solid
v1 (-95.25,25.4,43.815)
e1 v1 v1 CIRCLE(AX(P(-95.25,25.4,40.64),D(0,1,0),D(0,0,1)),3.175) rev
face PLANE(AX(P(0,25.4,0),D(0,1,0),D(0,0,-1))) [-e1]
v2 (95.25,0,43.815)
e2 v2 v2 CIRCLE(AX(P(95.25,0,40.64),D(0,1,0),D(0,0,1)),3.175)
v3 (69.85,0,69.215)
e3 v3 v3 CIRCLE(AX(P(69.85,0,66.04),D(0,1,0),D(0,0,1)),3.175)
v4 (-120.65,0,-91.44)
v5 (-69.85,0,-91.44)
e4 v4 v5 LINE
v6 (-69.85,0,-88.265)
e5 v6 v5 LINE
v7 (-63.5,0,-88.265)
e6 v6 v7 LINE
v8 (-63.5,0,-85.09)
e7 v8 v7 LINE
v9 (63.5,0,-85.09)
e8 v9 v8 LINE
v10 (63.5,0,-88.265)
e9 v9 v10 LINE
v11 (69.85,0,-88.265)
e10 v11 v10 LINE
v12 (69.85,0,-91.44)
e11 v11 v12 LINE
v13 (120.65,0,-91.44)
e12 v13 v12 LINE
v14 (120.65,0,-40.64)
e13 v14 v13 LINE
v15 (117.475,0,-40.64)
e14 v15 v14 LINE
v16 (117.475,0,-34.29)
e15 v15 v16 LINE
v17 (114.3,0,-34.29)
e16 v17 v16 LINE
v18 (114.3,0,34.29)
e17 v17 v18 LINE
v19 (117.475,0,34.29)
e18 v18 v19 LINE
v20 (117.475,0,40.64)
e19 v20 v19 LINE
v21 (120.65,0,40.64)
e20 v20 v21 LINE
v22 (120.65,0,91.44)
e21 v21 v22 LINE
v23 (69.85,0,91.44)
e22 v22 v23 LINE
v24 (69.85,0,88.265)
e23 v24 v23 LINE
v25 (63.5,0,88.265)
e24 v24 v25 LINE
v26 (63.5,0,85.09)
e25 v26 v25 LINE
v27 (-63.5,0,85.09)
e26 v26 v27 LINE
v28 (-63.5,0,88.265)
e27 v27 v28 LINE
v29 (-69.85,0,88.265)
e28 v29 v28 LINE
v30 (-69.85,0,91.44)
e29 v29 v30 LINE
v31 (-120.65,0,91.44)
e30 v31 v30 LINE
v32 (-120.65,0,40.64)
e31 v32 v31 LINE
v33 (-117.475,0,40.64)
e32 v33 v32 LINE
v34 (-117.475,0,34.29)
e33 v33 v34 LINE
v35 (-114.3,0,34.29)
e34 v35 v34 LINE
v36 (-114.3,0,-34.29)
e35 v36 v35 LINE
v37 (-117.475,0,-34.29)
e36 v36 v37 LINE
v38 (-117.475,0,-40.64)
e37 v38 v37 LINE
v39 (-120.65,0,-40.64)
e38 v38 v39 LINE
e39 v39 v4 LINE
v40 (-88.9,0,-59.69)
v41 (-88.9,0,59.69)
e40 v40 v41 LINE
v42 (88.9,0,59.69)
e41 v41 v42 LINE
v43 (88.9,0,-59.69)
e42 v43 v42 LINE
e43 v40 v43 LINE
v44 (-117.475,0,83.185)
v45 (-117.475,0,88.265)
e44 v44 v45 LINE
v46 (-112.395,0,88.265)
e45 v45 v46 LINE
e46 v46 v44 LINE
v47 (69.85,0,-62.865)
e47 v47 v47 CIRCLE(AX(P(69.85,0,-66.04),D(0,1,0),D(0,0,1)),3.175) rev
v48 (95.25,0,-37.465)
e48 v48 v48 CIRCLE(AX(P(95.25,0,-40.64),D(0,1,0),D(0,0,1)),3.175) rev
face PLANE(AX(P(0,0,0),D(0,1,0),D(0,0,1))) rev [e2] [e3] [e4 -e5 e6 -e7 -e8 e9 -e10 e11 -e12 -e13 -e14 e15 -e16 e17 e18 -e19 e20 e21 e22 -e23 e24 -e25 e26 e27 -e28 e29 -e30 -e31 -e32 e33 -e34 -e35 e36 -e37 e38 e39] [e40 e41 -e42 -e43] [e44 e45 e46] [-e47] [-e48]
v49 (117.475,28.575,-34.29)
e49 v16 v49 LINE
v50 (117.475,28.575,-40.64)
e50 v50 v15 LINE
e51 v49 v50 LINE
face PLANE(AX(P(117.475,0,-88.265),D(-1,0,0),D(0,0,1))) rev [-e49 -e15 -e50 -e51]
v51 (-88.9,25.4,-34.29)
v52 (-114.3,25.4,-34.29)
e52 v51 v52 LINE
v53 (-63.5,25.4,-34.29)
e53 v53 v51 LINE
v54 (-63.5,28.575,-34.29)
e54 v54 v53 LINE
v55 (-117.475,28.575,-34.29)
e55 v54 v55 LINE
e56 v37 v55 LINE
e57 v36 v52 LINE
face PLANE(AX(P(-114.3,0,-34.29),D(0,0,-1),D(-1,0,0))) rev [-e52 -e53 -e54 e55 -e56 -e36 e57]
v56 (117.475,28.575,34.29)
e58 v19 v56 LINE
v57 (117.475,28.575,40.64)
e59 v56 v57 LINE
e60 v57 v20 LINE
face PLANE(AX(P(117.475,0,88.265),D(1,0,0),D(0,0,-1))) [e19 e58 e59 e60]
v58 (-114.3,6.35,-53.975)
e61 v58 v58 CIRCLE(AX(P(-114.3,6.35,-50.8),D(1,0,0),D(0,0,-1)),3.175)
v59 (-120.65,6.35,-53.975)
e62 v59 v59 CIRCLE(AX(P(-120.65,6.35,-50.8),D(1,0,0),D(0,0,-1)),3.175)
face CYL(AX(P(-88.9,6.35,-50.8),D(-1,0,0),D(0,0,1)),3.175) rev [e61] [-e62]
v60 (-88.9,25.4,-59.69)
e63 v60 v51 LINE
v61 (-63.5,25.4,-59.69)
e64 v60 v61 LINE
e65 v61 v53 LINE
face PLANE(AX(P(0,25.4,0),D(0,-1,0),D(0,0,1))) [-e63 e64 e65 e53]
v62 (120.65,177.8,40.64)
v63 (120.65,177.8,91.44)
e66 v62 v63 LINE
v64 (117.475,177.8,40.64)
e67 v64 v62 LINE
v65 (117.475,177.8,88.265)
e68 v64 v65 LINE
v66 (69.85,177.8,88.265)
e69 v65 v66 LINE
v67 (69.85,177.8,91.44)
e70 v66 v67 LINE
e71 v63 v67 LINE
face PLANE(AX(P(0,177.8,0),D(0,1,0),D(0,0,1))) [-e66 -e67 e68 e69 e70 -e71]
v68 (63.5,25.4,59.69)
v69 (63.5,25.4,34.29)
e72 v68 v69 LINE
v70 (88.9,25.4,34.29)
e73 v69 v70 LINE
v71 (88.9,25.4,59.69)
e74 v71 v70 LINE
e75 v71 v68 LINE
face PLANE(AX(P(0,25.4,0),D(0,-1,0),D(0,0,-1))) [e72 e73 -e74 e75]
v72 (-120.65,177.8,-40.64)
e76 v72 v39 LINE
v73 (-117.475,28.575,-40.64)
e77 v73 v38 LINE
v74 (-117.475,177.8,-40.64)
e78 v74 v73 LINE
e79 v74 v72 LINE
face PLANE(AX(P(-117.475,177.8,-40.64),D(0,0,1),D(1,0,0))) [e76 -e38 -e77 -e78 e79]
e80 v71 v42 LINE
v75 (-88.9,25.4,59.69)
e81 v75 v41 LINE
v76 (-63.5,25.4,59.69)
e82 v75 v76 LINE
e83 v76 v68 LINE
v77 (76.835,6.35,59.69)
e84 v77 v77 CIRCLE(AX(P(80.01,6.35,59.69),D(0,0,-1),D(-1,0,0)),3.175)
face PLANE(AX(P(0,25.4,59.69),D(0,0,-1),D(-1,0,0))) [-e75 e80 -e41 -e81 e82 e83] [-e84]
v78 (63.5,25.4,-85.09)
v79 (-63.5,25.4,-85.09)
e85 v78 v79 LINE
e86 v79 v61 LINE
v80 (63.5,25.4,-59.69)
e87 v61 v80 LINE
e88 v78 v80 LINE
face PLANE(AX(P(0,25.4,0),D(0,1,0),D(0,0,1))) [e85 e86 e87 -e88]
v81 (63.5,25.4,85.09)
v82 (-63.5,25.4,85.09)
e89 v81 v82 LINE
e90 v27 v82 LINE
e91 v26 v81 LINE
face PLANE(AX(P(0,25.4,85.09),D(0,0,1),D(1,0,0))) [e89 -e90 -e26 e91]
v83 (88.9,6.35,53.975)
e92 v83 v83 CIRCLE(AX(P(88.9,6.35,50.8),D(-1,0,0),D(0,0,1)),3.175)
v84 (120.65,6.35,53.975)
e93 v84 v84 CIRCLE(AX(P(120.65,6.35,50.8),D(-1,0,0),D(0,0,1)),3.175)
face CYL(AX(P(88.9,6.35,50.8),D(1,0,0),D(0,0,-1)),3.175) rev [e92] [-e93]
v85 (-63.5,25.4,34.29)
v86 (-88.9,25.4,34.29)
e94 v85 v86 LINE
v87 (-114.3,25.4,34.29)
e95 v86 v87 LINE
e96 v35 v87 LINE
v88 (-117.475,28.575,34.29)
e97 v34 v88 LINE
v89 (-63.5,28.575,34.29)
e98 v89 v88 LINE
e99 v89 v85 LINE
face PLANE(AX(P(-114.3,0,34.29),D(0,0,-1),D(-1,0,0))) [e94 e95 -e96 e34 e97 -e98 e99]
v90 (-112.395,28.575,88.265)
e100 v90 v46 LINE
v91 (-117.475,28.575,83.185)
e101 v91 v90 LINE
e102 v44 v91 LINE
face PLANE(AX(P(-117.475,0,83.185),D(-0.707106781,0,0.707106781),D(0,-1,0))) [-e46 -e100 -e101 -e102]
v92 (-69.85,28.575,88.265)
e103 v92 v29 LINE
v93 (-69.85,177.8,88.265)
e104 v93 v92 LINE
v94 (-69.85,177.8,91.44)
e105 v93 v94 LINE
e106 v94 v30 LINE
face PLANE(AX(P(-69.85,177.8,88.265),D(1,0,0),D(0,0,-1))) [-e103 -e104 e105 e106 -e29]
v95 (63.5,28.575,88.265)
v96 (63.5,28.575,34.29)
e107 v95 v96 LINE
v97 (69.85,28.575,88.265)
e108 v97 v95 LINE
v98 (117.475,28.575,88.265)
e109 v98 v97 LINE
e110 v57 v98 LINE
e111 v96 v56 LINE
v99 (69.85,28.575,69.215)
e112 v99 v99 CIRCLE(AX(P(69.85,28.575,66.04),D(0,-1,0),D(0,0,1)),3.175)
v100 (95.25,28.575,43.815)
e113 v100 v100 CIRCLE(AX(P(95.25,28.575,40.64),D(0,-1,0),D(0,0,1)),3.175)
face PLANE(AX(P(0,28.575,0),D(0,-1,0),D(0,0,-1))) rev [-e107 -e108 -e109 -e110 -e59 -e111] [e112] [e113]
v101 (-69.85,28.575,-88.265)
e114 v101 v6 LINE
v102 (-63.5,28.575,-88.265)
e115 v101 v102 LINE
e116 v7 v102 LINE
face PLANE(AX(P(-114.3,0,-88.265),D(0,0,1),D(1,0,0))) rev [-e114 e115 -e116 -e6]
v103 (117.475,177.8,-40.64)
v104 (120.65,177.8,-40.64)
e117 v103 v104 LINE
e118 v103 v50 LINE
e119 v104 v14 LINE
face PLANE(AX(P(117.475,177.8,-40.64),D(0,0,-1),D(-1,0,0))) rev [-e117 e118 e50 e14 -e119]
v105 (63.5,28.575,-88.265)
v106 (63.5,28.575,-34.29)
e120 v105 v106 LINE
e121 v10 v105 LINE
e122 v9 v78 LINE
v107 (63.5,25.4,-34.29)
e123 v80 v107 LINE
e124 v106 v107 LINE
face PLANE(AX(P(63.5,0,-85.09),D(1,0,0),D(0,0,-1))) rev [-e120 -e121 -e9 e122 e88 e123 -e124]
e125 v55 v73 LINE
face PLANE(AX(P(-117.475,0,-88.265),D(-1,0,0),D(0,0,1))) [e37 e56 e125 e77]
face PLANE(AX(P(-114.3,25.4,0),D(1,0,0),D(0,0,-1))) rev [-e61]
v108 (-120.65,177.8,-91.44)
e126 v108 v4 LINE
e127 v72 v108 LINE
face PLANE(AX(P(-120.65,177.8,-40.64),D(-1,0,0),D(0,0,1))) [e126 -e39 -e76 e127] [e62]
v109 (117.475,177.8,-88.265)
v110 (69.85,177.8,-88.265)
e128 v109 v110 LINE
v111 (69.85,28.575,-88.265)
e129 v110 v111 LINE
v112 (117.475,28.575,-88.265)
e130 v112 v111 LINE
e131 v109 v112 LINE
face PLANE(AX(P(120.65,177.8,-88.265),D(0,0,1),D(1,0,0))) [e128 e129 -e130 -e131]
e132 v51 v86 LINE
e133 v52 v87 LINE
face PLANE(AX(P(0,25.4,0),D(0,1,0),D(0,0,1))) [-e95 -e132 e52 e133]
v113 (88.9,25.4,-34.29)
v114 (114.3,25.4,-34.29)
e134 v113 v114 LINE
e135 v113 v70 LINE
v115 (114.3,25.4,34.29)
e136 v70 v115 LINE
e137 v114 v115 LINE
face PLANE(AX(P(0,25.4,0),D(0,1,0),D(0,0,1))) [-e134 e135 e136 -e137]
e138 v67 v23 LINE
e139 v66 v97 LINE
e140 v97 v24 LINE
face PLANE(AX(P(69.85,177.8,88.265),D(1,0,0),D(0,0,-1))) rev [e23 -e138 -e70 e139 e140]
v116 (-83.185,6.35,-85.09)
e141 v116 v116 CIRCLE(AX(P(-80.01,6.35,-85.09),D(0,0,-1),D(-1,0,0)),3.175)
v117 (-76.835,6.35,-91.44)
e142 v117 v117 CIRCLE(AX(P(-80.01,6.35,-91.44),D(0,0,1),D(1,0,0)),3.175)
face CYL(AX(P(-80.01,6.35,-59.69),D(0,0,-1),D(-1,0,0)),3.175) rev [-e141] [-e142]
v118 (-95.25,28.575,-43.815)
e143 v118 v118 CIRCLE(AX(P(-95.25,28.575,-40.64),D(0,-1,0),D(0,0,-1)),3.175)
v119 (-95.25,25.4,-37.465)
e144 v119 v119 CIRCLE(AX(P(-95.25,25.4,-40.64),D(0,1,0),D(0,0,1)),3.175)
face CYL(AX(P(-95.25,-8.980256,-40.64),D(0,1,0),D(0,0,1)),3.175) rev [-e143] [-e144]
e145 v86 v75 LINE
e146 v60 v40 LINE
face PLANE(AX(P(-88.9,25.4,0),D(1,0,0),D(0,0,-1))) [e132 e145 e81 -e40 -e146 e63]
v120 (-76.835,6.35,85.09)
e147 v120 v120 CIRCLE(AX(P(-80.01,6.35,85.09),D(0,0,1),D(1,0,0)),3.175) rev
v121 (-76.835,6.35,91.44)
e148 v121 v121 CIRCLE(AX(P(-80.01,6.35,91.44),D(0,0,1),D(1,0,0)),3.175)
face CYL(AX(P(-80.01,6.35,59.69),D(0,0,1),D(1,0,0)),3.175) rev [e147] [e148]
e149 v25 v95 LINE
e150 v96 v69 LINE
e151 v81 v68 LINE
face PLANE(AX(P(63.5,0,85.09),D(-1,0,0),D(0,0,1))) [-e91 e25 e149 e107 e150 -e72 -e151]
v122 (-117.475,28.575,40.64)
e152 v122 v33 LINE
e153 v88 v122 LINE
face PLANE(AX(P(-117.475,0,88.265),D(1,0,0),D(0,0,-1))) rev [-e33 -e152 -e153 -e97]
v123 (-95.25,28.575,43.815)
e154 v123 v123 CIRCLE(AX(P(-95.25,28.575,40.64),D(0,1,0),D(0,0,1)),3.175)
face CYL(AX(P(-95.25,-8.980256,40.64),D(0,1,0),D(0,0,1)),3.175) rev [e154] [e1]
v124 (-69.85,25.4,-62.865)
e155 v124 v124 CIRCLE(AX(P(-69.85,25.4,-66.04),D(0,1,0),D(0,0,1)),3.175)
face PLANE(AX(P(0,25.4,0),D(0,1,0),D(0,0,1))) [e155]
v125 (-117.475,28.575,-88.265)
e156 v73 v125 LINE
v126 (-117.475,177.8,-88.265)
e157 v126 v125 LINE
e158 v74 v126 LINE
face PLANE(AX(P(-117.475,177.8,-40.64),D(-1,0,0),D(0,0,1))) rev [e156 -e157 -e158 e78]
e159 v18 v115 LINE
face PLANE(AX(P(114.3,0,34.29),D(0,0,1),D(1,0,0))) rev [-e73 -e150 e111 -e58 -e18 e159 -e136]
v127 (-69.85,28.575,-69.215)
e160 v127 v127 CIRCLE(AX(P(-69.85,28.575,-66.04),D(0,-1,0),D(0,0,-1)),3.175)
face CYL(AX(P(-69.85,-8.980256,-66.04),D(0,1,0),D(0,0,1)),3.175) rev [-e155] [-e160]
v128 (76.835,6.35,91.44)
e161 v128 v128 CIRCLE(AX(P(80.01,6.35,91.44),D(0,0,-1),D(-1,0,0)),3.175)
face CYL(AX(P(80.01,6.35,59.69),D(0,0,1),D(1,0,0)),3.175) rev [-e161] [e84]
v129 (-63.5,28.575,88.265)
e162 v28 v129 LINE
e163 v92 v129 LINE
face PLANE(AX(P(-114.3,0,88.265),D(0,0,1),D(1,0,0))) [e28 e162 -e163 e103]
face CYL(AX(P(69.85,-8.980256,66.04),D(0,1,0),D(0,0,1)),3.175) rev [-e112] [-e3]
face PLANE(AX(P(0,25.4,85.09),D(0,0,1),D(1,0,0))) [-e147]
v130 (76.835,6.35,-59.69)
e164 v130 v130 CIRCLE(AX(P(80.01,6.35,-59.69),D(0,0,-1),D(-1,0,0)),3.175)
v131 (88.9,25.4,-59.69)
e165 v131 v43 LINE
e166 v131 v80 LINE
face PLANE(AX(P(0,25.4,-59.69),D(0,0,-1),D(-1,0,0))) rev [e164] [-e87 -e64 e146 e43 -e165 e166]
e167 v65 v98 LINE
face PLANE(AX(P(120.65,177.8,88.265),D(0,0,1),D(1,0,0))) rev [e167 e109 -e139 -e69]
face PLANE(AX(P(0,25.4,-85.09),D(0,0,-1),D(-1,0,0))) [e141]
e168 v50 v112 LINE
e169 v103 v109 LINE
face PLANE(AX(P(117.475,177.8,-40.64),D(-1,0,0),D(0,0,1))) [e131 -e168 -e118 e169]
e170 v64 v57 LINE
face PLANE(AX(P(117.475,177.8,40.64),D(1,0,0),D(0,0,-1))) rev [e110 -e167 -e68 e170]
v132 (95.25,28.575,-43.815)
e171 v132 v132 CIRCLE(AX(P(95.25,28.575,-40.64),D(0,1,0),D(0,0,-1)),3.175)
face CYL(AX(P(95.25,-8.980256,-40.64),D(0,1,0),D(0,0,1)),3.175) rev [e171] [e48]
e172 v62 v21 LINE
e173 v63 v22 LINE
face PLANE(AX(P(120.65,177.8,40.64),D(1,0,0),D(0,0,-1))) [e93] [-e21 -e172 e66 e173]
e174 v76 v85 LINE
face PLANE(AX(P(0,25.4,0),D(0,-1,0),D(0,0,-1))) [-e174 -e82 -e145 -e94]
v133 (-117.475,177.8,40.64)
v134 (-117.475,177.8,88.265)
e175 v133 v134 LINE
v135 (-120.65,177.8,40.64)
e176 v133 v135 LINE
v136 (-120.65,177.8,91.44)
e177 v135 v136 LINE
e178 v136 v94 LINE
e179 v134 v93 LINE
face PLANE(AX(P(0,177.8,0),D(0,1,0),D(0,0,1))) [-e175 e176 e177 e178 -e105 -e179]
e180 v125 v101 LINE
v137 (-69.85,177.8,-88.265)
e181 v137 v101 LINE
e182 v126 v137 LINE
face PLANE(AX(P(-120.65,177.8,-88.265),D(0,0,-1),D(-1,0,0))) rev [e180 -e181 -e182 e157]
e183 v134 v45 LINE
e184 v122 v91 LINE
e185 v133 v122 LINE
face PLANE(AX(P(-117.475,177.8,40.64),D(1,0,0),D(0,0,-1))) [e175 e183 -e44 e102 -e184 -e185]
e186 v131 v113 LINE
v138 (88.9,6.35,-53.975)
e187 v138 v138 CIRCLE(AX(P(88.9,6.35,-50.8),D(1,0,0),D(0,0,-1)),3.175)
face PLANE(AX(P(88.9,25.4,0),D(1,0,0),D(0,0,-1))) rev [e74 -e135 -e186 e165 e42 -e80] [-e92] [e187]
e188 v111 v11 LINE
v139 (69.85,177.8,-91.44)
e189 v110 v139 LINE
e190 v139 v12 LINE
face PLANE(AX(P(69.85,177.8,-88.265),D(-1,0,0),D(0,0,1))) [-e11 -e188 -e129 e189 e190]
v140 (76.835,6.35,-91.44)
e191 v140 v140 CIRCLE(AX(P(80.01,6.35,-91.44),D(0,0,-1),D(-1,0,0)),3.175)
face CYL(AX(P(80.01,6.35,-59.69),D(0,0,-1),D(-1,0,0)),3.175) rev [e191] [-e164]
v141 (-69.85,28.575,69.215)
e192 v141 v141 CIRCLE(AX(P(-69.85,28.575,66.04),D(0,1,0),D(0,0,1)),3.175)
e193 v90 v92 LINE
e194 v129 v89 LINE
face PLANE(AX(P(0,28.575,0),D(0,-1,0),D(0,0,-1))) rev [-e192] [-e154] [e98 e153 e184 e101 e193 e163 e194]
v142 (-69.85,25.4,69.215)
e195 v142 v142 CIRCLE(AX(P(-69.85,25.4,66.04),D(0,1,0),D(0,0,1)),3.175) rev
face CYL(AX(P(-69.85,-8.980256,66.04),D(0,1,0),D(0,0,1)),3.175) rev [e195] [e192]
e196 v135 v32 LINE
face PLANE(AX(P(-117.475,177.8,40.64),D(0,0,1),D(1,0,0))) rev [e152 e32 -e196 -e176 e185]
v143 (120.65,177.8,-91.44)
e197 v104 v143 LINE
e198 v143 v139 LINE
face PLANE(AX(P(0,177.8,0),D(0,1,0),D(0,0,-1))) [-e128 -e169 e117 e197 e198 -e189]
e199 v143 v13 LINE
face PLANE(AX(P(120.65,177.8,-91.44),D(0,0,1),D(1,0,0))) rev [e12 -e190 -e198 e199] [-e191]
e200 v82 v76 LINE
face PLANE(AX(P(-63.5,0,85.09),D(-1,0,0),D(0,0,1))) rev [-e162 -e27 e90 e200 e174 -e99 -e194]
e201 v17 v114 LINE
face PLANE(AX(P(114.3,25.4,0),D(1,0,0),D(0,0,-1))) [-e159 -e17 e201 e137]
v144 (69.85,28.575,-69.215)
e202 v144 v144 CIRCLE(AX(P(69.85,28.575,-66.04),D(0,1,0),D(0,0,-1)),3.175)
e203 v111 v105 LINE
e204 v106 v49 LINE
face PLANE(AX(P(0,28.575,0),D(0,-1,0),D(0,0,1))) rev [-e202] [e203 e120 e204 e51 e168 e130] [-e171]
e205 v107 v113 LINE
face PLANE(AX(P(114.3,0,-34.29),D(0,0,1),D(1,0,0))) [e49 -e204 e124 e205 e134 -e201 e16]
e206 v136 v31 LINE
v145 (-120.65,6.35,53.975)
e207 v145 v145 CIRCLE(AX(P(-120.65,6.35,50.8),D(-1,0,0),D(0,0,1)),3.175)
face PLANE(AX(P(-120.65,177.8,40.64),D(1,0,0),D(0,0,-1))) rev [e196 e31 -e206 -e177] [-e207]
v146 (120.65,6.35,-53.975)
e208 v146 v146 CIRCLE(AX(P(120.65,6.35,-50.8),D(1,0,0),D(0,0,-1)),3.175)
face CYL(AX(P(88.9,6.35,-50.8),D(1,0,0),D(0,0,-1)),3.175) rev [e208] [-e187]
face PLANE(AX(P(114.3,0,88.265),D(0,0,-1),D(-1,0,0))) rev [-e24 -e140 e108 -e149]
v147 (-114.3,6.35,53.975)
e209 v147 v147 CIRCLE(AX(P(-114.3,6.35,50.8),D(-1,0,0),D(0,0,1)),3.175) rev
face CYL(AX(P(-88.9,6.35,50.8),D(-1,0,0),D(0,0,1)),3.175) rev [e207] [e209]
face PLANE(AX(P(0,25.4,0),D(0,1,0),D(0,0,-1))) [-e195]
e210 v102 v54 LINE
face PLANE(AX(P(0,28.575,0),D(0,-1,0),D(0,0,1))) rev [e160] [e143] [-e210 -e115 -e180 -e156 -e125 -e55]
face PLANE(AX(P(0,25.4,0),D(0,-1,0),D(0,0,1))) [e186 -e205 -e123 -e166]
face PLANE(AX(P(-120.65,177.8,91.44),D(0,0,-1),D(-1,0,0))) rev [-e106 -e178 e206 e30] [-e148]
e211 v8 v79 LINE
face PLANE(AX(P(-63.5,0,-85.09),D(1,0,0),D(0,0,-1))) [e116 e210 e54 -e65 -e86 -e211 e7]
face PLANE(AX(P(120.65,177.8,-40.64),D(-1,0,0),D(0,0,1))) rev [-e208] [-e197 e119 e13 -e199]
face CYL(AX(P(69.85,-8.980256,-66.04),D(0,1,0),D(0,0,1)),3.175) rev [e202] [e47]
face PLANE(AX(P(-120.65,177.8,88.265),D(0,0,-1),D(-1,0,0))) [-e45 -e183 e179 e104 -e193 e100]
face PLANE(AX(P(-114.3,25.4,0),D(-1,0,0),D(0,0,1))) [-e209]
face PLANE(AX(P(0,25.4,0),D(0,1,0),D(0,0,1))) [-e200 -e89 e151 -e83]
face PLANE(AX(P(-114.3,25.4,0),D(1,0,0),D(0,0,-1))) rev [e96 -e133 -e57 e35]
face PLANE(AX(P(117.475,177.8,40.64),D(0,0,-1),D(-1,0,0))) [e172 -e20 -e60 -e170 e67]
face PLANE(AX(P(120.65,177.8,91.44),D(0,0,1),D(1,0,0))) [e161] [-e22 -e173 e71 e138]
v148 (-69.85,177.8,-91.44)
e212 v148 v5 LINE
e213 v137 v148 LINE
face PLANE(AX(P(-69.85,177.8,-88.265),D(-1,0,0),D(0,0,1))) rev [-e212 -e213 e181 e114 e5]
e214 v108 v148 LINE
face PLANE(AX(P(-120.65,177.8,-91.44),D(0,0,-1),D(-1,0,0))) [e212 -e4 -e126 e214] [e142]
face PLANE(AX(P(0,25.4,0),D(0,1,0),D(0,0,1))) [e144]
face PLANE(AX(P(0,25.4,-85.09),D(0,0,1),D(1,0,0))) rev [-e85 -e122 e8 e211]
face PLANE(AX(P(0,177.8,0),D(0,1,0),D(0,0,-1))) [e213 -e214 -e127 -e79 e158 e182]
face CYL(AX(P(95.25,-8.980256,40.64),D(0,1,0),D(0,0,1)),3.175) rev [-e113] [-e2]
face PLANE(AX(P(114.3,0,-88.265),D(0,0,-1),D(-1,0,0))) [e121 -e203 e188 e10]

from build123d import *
from build123d.topology import SkipClean

# Parameters (mm, degrees)
SKETCH2_W             = 25.4
SKETCH2_H             = 119.38
BOSS_EXTRUDE1_DEPTH   = 25.4
SKETCH8_W             = 50.8
SKETCH8_H             = 3.175
BOSS_EXTRUDE9_DEPTH   = 25.4
SKETCH11_W            = 53.975
SKETCH11_H            = 53.975
BOSS_EXTRUDE12_DEPTH  = 3.175
CHAMFER3_SIZE         = 5.08
SKETCH10_W            = 3.175
SKETCH10_H            = 47.625
BOSS_EXTRUDE11_DEPTH  = 177.8
SKETCH13_R            = 3.175
CUT_EXTRUDE3_DEPTH    = 31.75
SKETCH14_R            = 3.175
CUT_EXTRUDE4_DEPTH    = 28.575
SKETCH16_R            = 3.175
CUT_EXTRUDE5_DEPTH    = 31.75
MIRROR71_START        = -1
MIRROR71_OUTLINE_R    = 3.175
MIRROR71_DEPTH        = 26.4
MIRROR71_2_DEPTH      = 177.8
MIRROR71_START_2      = 25.4
MIRROR71_3_OUTLINE_R  = 3.175
MIRROR71_3_DEPTH      = 3.175
MIRROR71_START_3      = 9.525
MIRROR71_4_OUTLINE_R  = 3.175
MIRROR71_4_DEPTH      = 15.875
MIRROR71_5_OUTLINE_R  = 3.175
MIRROR71_5_DEPTH      = 3.1749999
MIRROR71_START_4      = 2.6969085
MIRROR71_6_OUTLINE_R  = 3.175
MIRROR71_6_DEPTH      = 17.145
MIRROR71_START_5      = -85.09
MIRROR71_7_OUTLINE_W  = 3.175
MIRROR71_7_OUTLINE_H  = 6.3500001
MIRROR71_7_OUTLINE_R  = 3.175
MIRROR71_7_DEPTH      = 25.4
MIRROR71_START_6      = 59.69
MIRROR71_8_DEPTH      = 28.575
MIRROR71_START_7      = -88.265
MIRROR71_9_DEPTH      = 3.175
MIRROR71_START_8      = 85.09
MIRROR71_10_DEPTH     = 3.175
MIRROR71_START_9      = -91.896565
MIRROR71_11_OUTLINE_W = 6.3500001
MIRROR71_11_OUTLINE_H = 25.4
MIRROR71_11_DEPTH     = 155.396565
MIRROR71_START_10     = 88.9
MIRROR71_12_DEPTH     = 28.575
MIRROR71_START_11     = -114.3
MIRROR71_13_OUTLINE_R = 3.175
MIRROR71_13_DEPTH     = 25.4
MIRROR71_START_12     = 114.3
MIRROR71_14_DEPTH     = 3.175
MIRROR71_START_13     = -92
MIRROR71_15_OUTLINE_R = 3.175
MIRROR71_15_DEPTH     = 184
MIRROR71_16_OUTLINE_R = 3.175
MIRROR71_16_DEPTH     = 33.1


with BuildPart() as part:
    # Sketch2 → Boss-Extrude1 (new body)
    with BuildSketch(Plane(origin=(0, 0, 0), x_dir=(1, 0, 0), z_dir=(0, 1, 0))):
        Polygon((114.3, -59.69), (88.9, -59.69), (-88.9, -59.69), (-114.3, -59.69), (-114.3, -85.09), (114.3, -85.09), align=None)
        with Locations((101.6, 0)):
            Rectangle(SKETCH2_W, SKETCH2_H)
        Polygon((-88.9, 59.69), (88.9, 59.69), (114.3, 59.69), (114.3, 85.09), (-114.3, 85.09), (-114.3, 59.69), align=None)
        with Locations((-101.6, 0)):
            Rectangle(SKETCH2_W, SKETCH2_H)
    boss_extrude1 = extrude(amount=BOSS_EXTRUDE1_DEPTH)

    # Sketch8 → Boss-Extrude9 (add)
    with BuildSketch(Plane(origin=(0, 25.4, 0), x_dir=(1, 0, 0), z_dir=(0, 1, 0))):
        with Locations((-88.9, -86.6775)):
            Rectangle(SKETCH8_W, SKETCH8_H)
        Polygon((-114.3, -88.265), (-114.3, -85.09), (-114.3, -34.29), (-117.475, -34.29), (-117.475, -88.265), align=None)
    boss_extrude9 = extrude(amount=-BOSS_EXTRUDE9_DEPTH)

    # Sketch11 → Boss-Extrude12 (add)
    with BuildSketch(Plane(origin=(0, 25.4, 0), x_dir=(1, 0, 0), z_dir=(0, 1, 0))):
        with Locations((-90.4875, -61.2775)):
            Rectangle(SKETCH11_W, SKETCH11_H)
    boss_extrude12 = extrude(amount=BOSS_EXTRUDE12_DEPTH)

    # Chamfer3
    chamfer3_edges = [part.edges().sort_by_distance(p)[0] for p in [
        (-117.475, 14.2875, 88.265),
    ]]
    chamfer(chamfer3_edges, length=CHAMFER3_SIZE)

    # Sketch10 → Boss-Extrude11 (add)
    with BuildSketch(Plane(origin=(0, 0, 0), x_dir=(-1, 0, 0), z_dir=(0, -1, 0))):
        with Locations((119.0625, -64.4525)):
            Rectangle(SKETCH10_W, SKETCH10_H)
        Polygon((120.65, -88.265), (117.475, -88.265), (69.85, -88.265), (69.85, -91.44), (120.65, -91.44), align=None)
    boss_extrude11 = extrude(amount=-BOSS_EXTRUDE11_DEPTH)

    # Sketch13 → Cut-Extrude3 (cut)
    with BuildSketch(Plane.XY.offset(91.44)):
        with Locations((-80.01, 6.35)):
            Circle(SKETCH13_R)
    cut_extrude3 = extrude(amount=-CUT_EXTRUDE3_DEPTH, mode=Mode.SUBTRACT)

    # Sketch14 → Cut-Extrude4 (cut)
    with BuildSketch(Plane(origin=(0, 28.575, 0), x_dir=(1, 0, 0), z_dir=(0, 1, 0))):
        with Locations(Location((-69.85, -66.04, 0), (0, 0, 270))):
            Circle(SKETCH14_R)
        with Locations(Location((-95.25, -40.64, 0), (0, 0, 270))):
            Circle(SKETCH14_R)
    cut_extrude4 = extrude(amount=-CUT_EXTRUDE4_DEPTH, mode=Mode.SUBTRACT)

    # Sketch16 → Cut-Extrude5 (cut)
    with BuildSketch(Plane.ZY.offset(120.65)):
        with Locations((50.8, 6.35)):
            Circle(SKETCH16_R)
    cut_extrude5 = extrude(amount=-CUT_EXTRUDE5_DEPTH, mode=Mode.SUBTRACT)

    # Mirror70: Boss-Extrude1, Boss-Extrude9, Boss-Extrude12, Boss-Extrude11, Cut-Extrude3, Cut-Extrude4, Cut-Extrude5 across plane
    add(boss_extrude1.mirror(Plane.XY))
    add(boss_extrude9.mirror(Plane.XY))
    add(boss_extrude12.mirror(Plane.XY))
    add(boss_extrude11.mirror(Plane.XY))
    add(cut_extrude3.mirror(Plane.XY), mode=Mode.SUBTRACT)
    add(cut_extrude4.mirror(Plane.XY), mode=Mode.SUBTRACT)
    add(cut_extrude5.mirror(Plane.XY), mode=Mode.SUBTRACT)

    # Mirror71: read off the stored shape, not the designer's step
    # Mirror71 outline → Mirror71 (cut)
    with BuildSketch(Plane(origin=(0, 0, 0), x_dir=(1, 0, 0), z_dir=(0, 1, 0)).offset(MIRROR71_START)):
        with Locations((69.85, 66.04)):
            Circle(MIRROR71_OUTLINE_R)
        with Locations((95.25, 40.64)):
            Circle(MIRROR71_OUTLINE_R)
        with Locations((69.85, -66.04)):
            Circle(MIRROR71_OUTLINE_R)
        with Locations((95.25, -40.64)):
            Circle(MIRROR71_OUTLINE_R)
    extrude(amount=MIRROR71_DEPTH, mode=Mode.SUBTRACT)



with BuildPart() as body_2:
    # Mirror71 2 outline → Mirror71 2 (new body)
    with BuildSketch(Plane(origin=(0, 0, 0), x_dir=(1, 0, 0), z_dir=(0, 1, 0))):
        Polygon((117.475, -88.265), (69.85, -88.265), (69.85, -91.44), (120.65, -91.44), (120.65, -40.64), (117.475, -40.64), align=None)
        Polygon((117.475, 88.265), (117.475, 40.64), (120.65, 40.64), (120.65, 91.44), (69.85, 91.44), (69.85, 88.265), align=None)
    extrude(amount=MIRROR71_2_DEPTH)


with BuildPart() as part_1:
    add(part.part)

    add(body_2.part)  # Mirror71 3 merges body 2
    # Mirror71 3 outline → Mirror71 3 (add)
    # profile 1 of 2: a face of its own
    with BuildSketch(Plane(origin=(0, 0, 0), x_dir=(1, 0, 0), z_dir=(0, 1, 0)).offset(MIRROR71_START_2)):
        Polygon((63.5, -88.265), (117.475, -88.265), (117.475, -34.29), (88.9, -34.29), (63.5, -34.29), align=None)
        with Locations((95.25, -40.64)):
            Circle(MIRROR71_3_OUTLINE_R, mode=Mode.SUBTRACT)
        with Locations((69.85, -66.04)):
            Circle(MIRROR71_3_OUTLINE_R, mode=Mode.SUBTRACT)
    # profile 2 of 2: a face of its own
    with BuildSketch(Plane(origin=(0, 0, 0), x_dir=(1, 0, 0), z_dir=(0, 1, 0)).offset(MIRROR71_START_2)):
        Polygon((63.5, 34.29), (88.9, 34.29), (117.475, 34.29), (117.475, 88.265), (63.5, 88.265), align=None)
        with Locations((95.25, 40.64)):
            Circle(MIRROR71_3_OUTLINE_R, mode=Mode.SUBTRACT)
        with Locations((69.85, 66.04)):
            Circle(MIRROR71_3_OUTLINE_R, mode=Mode.SUBTRACT)
    extrude(amount=MIRROR71_3_DEPTH)

    # Mirror71 4 outline → Mirror71 4 (add)
    with BuildSketch(Plane(origin=(0, 0, 0), x_dir=(1, 0, 0), z_dir=(0, 1, 0)).offset(MIRROR71_START_3)):
        Polygon((63.5, -88.265), (117.475, -88.265), (117.475, -34.29), (114.3, -34.29), (114.3, -85.09), (63.5, -85.09), align=None)
        Polygon((114.3, 85.09), (114.3, 34.29), (117.475, 34.29), (117.475, 88.265), (63.5, 88.265), (63.5, 85.09), align=None)
        with Locations((-69.85, 66.04)):
            Circle(MIRROR71_4_OUTLINE_R)
        with Locations((-95.25, 40.64)):
            Circle(MIRROR71_4_OUTLINE_R)
    extrude(amount=MIRROR71_4_DEPTH)

    # Mirror71 5 outline → Mirror71 5 (add)
    with BuildSketch(Plane(origin=(0, 0, 0), x_dir=(1, 0, 0), z_dir=(0, 1, 0))):
        Polygon((63.5, -88.265), (117.475, -88.265), (117.475, -34.29), (114.3, -34.29), (114.3, -85.09), (63.5, -85.09), align=None)
        Polygon((114.3, 85.09), (114.3, 34.29), (117.475, 34.29), (117.475, 88.265), (63.5, 88.265), (63.5, 85.09), align=None)
        with Locations((-69.85, 66.04)):
            Circle(MIRROR71_5_OUTLINE_R)
        with Locations((-95.25, 40.64)):
            Circle(MIRROR71_5_OUTLINE_R)
    extrude(amount=MIRROR71_5_DEPTH)

    # Mirror71 6 outline → Mirror71 6 (add)
    with BuildSketch(Plane(origin=(0, 0, 0), x_dir=(1, 0, 0), z_dir=(0, 1, 0)).offset(MIRROR71_START_4)):
        with Locations((-69.85, 66.04)):
            Circle(MIRROR71_6_OUTLINE_R)
        with Locations((-95.25, 40.64)):
            Circle(MIRROR71_6_OUTLINE_R)
    extrude(amount=MIRROR71_6_DEPTH)

    # Mirror71 7 outline → Mirror71 7 (add)
    with BuildSketch(Plane.XY.offset(MIRROR71_START_5)):
        with Locations((115.8875, 6.34999995)):
            Rectangle(MIRROR71_7_OUTLINE_W, MIRROR71_7_OUTLINE_H)
        with Locations((-80.01, 6.35)):
            Circle(MIRROR71_7_OUTLINE_R)
    extrude(amount=MIRROR71_7_DEPTH)

    # Mirror71 8 outline → Mirror71 8 (add)
    with BuildSketch(Plane.XY.offset(MIRROR71_START_6)):
        with BuildLine():
            ThreePointArc((80.01, 9.525), (83.185, 6.35), (80.01, 3.175))
            Line((80.01, 3.175), (117.475, 3.1749999))
            Line((117.475, 3.1749999), (117.475, 9.525))
            Line((117.475, 9.525), (80.01, 9.525))
        make_face()
    extrude(amount=MIRROR71_8_DEPTH)

    # Mirror71 9 outline → Mirror71 9 (add)
    with BuildSketch(Plane.XY.offset(MIRROR71_START_7)):
        with BuildLine():
            ThreePointArc((80.01, 9.525), (83.185, 6.35), (80.01, 3.175))
            Line((80.01, 3.175), (117.475, 3.1749999))
            Line((117.475, 3.1749999), (117.475, 9.525))
            Line((117.475, 9.525), (80.01, 9.525))
        make_face()
        with BuildLine():
            ThreePointArc((80.01, 3.175), (76.835, 6.35), (80.01, 9.525))
            Line((80.01, 9.525), (63.5, 9.525))
            Line((63.5, 9.525), (63.5, 3.1749999))
            Line((63.5, 3.1749999), (80.01, 3.175))
        make_face()
    extrude(amount=MIRROR71_9_DEPTH)

    # Mirror71 10 outline → Mirror71 10 (add)
    with BuildSketch(Plane.XY.offset(MIRROR71_START_8)):
        with BuildLine():
            ThreePointArc((80.01, 3.175), (76.835, 6.35), (80.01, 9.525))
            Line((80.01, 9.525), (63.5, 9.525))
            Line((63.5, 9.525), (63.5, 3.1749999))
            Line((63.5, 3.1749999), (80.01, 3.175))
        make_face()
    extrude(amount=MIRROR71_10_DEPTH)

    # Mirror71 11 outline → Mirror71 11 (add)
    with BuildSketch(Plane.YZ.offset(MIRROR71_START_9)):
        with Locations((6.34999995, -72.39)):
            Rectangle(MIRROR71_11_OUTLINE_W, MIRROR71_11_OUTLINE_H)
    extrude(amount=MIRROR71_11_DEPTH)

    # Mirror71 12 outline → Mirror71 12 (add)
    with BuildSketch(Plane.YZ.offset(MIRROR71_START_10)):
        with BuildLine():
            ThreePointArc((9.525, -50.8), (6.35, -53.975), (3.175, -50.8))
            Line((3.175, -50.8), (3.1749999, -88.265))
            Line((3.1749999, -88.265), (9.525, -88.265))
            Line((9.525, -88.265), (9.525, -50.8))
        make_face()
        with BuildLine():
            ThreePointArc((3.175, 50.8), (6.35, 53.975), (9.525, 50.8))
            Line((9.525, 50.8), (9.525, 88.265))
            Line((9.525, 88.265), (3.1749999, 88.265))
            Line((3.1749999, 88.265), (3.175, 50.8))
        make_face()
    extrude(amount=MIRROR71_12_DEPTH)

    # Mirror71 13 outline → Mirror71 13 (add)
    with BuildSketch(Plane.YZ.offset(MIRROR71_START_11)):
        with Locations((6.35, -50.8)):
            Circle(MIRROR71_13_OUTLINE_R)
    extrude(amount=MIRROR71_13_DEPTH)

    # Mirror71 14 outline → Mirror71 14 (add)
    with BuildSketch(Plane.YZ.offset(MIRROR71_START_12)):
        with BuildLine():
            ThreePointArc((3.175, -50.8), (6.35, -47.625), (9.525, -50.8))
            Line((9.525, -50.8), (9.525, -34.29))
            Line((9.525, -34.29), (3.1749999, -34.29))
            Line((3.1749999, -34.29), (3.175, -50.8))
        make_face()
        with BuildLine():
            Line((9.525, 34.29), (9.525, 50.8))
            ThreePointArc((9.525, 50.8), (6.35, 47.625), (3.175, 50.8))
            Line((3.175, 50.8), (3.1749999, 34.29))
            Line((3.1749999, 34.29), (9.525, 34.29))
        make_face()
    extrude(amount=MIRROR71_14_DEPTH)

    # Mirror71 15 outline → Mirror71 15 (cut)
    with SkipClean():  # the faces are left unmerged after this step: merging them gives an invalid solid
        with BuildSketch(Plane.XY.offset(MIRROR71_START_13)):
            with Locations((80.01, 6.35)):
                Circle(MIRROR71_15_OUTLINE_R)
        extrude(amount=MIRROR71_15_DEPTH, mode=Mode.SUBTRACT)

    # Mirror71 16 outline → Mirror71 16 (cut)
    with SkipClean():  # the faces are left unmerged after this step: merging them gives an invalid solid
        with BuildSketch(Plane.YZ.offset(MIRROR71_START_10)):
            with Locations((6.35, -50.8)):
                Circle(MIRROR71_16_OUTLINE_R)
            with Locations((6.35, 50.8)):
                Circle(MIRROR71_16_OUTLINE_R)
        extrude(amount=MIRROR71_16_DEPTH, mode=Mode.SUBTRACT)


solid = part_1.part
